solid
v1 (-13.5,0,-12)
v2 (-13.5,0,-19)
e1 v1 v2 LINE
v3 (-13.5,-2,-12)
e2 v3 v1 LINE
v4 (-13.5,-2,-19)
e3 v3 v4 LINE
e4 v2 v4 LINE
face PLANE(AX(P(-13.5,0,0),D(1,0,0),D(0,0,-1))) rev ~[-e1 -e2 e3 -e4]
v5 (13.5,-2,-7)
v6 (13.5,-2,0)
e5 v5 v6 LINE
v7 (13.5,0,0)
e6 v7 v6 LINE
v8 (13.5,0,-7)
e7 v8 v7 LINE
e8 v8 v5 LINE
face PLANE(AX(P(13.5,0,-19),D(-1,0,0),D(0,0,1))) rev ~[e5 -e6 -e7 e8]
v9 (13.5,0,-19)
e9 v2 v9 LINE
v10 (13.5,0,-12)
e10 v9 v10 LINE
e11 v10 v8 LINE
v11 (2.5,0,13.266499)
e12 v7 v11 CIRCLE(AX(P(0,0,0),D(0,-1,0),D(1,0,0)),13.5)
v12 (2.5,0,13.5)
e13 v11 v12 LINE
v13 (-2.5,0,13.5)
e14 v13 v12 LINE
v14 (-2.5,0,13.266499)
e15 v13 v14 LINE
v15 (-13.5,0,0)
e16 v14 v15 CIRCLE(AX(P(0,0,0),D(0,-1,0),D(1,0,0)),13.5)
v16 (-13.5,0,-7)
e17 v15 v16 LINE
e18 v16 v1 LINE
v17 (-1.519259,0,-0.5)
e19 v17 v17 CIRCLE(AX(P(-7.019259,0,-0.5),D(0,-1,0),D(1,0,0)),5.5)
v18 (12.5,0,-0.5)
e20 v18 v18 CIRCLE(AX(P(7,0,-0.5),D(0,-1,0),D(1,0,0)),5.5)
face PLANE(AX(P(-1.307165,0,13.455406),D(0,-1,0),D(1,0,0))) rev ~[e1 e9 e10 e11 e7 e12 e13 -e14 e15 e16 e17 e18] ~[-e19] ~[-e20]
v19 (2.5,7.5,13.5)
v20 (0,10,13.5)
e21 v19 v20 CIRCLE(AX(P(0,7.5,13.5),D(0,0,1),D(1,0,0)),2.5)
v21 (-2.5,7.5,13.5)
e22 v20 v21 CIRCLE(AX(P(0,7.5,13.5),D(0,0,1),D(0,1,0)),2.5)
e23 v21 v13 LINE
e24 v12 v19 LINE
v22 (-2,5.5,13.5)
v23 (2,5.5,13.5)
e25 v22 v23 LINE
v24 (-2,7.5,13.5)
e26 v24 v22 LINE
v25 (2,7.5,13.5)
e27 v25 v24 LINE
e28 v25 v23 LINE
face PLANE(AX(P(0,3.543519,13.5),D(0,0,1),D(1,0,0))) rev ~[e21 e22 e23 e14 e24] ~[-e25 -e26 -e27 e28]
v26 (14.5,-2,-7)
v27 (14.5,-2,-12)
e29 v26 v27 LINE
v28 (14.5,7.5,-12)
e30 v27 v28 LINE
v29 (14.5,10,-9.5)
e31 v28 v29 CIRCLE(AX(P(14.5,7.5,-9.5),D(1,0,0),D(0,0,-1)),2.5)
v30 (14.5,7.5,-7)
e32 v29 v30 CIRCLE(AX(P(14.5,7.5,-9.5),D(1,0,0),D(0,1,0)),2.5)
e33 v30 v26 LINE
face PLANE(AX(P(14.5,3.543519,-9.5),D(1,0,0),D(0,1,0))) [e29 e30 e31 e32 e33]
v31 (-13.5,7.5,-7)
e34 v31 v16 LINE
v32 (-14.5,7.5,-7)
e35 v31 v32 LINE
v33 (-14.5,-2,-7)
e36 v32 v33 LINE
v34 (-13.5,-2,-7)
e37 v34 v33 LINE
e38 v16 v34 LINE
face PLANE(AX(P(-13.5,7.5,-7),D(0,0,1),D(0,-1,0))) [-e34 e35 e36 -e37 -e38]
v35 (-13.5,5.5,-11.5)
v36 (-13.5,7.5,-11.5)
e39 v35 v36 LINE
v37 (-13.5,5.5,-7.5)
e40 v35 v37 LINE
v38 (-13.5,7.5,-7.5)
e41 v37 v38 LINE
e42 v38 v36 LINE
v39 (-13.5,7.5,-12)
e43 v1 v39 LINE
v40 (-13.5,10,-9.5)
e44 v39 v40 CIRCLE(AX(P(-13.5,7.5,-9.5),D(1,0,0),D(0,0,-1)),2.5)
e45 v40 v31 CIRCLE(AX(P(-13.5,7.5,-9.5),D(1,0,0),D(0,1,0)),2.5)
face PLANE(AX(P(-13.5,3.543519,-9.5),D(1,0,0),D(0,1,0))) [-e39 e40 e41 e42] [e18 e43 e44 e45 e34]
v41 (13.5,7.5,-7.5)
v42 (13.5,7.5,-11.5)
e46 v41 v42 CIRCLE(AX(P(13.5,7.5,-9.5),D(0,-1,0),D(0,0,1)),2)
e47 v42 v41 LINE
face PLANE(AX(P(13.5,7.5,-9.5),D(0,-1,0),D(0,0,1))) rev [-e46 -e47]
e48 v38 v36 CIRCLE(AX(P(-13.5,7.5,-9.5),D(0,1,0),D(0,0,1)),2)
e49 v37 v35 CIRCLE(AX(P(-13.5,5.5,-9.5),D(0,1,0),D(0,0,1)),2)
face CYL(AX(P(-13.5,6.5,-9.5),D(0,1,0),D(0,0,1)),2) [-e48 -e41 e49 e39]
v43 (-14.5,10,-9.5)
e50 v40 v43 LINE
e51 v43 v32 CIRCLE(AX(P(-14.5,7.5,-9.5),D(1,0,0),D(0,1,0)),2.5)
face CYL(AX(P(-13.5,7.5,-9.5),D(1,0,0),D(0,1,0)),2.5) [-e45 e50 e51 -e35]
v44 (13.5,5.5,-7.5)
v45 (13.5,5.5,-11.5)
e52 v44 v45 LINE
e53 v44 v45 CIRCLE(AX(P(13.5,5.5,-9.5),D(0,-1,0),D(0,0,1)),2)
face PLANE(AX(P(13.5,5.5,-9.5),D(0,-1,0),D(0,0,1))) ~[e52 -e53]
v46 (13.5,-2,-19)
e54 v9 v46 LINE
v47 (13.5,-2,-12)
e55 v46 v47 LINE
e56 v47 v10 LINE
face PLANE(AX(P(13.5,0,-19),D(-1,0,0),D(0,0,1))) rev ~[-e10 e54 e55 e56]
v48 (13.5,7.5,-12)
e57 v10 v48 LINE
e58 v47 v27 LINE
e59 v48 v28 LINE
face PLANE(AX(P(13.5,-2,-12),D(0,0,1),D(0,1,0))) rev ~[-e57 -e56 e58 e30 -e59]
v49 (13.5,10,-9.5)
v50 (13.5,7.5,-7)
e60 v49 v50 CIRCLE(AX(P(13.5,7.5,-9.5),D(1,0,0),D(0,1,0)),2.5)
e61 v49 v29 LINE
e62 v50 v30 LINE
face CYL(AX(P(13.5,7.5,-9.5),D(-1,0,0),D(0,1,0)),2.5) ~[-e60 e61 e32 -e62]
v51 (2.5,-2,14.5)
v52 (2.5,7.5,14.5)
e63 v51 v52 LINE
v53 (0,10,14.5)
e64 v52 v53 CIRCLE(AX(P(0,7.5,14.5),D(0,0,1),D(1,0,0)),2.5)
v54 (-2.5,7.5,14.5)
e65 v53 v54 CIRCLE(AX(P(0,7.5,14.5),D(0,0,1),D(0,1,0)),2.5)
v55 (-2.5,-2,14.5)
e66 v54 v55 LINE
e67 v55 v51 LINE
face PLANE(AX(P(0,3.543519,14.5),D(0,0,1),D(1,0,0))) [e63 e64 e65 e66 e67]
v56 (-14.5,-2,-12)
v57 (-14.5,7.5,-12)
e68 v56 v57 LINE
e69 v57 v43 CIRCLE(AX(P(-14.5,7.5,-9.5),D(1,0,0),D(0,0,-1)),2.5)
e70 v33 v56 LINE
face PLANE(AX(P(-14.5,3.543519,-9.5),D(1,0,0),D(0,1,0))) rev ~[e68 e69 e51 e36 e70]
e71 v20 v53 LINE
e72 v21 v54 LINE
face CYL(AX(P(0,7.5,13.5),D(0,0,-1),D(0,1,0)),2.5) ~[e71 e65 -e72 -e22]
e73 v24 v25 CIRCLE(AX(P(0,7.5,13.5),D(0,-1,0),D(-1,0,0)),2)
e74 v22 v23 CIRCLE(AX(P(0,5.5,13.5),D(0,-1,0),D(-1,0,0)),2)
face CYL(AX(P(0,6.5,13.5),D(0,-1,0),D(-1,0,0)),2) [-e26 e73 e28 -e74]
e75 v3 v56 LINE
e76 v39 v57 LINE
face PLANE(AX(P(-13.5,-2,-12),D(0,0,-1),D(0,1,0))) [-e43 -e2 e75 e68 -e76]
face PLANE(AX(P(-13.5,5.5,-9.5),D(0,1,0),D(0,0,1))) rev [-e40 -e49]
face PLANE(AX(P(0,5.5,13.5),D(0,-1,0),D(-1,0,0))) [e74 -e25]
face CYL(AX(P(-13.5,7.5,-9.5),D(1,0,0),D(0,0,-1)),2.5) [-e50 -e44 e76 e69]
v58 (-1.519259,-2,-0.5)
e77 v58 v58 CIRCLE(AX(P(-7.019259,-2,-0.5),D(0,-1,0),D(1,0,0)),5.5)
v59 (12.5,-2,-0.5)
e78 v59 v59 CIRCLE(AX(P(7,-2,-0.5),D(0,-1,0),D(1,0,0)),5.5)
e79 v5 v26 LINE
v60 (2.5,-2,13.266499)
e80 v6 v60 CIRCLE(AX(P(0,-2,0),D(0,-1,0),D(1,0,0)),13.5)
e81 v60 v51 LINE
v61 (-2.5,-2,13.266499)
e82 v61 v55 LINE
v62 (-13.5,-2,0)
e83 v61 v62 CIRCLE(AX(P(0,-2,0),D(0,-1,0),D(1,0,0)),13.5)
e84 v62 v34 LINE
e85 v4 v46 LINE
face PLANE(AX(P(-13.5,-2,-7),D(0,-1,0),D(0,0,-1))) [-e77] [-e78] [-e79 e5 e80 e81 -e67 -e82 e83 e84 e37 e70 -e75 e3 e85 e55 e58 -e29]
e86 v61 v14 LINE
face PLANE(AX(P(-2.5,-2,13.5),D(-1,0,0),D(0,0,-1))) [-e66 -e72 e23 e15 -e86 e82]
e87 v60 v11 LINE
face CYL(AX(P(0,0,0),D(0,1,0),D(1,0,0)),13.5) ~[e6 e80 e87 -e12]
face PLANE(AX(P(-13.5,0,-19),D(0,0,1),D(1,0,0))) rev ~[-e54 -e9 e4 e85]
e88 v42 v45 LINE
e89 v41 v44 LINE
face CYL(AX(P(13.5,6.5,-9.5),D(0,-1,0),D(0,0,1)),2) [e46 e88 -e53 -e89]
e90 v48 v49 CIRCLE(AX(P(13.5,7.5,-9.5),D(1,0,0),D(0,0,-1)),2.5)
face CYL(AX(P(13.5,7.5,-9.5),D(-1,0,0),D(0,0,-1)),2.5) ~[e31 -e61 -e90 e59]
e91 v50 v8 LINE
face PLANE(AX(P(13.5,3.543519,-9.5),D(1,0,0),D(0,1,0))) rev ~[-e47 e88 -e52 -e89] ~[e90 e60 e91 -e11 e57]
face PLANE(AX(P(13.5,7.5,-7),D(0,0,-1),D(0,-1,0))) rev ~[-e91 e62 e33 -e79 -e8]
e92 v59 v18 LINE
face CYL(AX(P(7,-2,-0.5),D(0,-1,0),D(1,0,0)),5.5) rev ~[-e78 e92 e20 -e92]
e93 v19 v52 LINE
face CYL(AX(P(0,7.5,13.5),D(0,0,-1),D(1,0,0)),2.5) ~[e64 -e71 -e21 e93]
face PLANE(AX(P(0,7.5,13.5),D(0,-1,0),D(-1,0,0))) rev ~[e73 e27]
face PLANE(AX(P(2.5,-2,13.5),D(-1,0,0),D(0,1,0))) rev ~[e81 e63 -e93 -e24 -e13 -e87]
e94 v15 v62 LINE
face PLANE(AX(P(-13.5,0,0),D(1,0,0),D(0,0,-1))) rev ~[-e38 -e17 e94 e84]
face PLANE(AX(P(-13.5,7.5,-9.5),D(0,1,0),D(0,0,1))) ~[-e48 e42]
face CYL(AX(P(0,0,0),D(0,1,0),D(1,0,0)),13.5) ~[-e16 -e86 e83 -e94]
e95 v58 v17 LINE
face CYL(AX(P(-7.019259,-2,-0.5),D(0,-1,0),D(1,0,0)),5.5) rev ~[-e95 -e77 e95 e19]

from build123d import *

# Parameters (mm, degrees)
F1_DEPTH  = 2
F4_DEPTH  = 1
F6_DEPTH  = 2
F9_DEPTH  = 1
F12_DEPTH = 1
F13_W     = 2
F13_H     = 2
F14_ANGLE = 180
F15_W     = 2
F15_H     = 2
F16_ANGLE = 180
F17_W     = 2
F17_H     = 2
F18_ANGLE = 180
F19_R     = 5.5
F20_DEPTH = 5


# Not quite as in the source:
# - a feature names something its author has since deleted; it is built from what else it names


with BuildPart() as f1:
    # F0 (on Front) → F1 (new body)
    with BuildSketch(Plane.XZ):
        with BuildLine():
            ThreePointArc((-13.5, 0), (0, -13.5), (13.5, 0))
            ThreePointArc((13.5, 0), (0, 13.5), (-13.5, 0))
        make_face()
        with BuildLine():
            Line((13.5, -19), (13.5, 0))
            ThreePointArc((13.5, 0), (0, -13.5), (-13.5, 0))
            Line((-13.5, 0), (-13.5, -19))
            Line((-13.5, -19), (13.5, -19))
        make_face()
    extrude(amount=F1_DEPTH)

    # F3 (on offset) → F4 (join)
    with BuildSketch(Plane.XY.offset(13.5)):
        with BuildLine():
            Line((-2.5, 7.5), (-2.5, -2))
            Line((-2.5, -2), (2.5, -2))
            Line((2.5, -2), (2.5, 7.5))
            ThreePointArc((2.5, 7.5), (1.767766953, 9.267766953), (0, 10))
            ThreePointArc((0, 10), (-1.767766953, 9.267766953), (-2.5, 7.5))
        make_face()
    extrude(amount=F4_DEPTH)

    # F5 (on face) → F6 (join)
    with BuildSketch(Plane.XZ.offset(2)):
        with BuildLine():
            Line((-2.5, 13.5), (-2.5, 13.2664991614))
            ThreePointArc((-2.5, 13.2664991614), (-1.2554404249, 13.4414980318), (0, 13.5))
            Line((0, 13.5), (-2.5, 13.5))
        make_face()
        with BuildLine():
            ThreePointArc((0, 13.5), (1.2554404249, 13.4414980318), (2.5, 13.2664991614))
            Line((2.5, 13.2664991614), (2.5, 13.5))
            Line((2.5, 13.5), (0, 13.5))
        make_face()
    extrude(amount=-F6_DEPTH)

    # F8 (on offset) → F9 (join)
    with BuildSketch(Plane.YZ.offset(13.5)):
        with BuildLine():
            Line((7.5, -7), (-2, -7))
            Line((-2, -7), (-2, -12))
            Line((-2, -12), (7.5, -12))
            ThreePointArc((7.5, -12), (9.267766953, -11.267766953), (10, -9.5))
            ThreePointArc((10, -9.5), (9.267766953, -7.732233047), (7.5, -7))
        make_face()
    extrude(amount=F9_DEPTH)

    # F11 (on offset) → F12 (join)
    with BuildSketch(Plane.YZ.offset(-13.5)):
        with BuildLine():
            Line((7.5, -7), (-2, -7))
            Line((-2, -7), (-2, -12))
            Line((-2, -12), (7.5, -12))
            ThreePointArc((7.5, -12), (9.267766953, -11.267766953), (10, -9.5))
            ThreePointArc((10, -9.5), (9.267766953, -7.732233047), (7.5, -7))
        make_face()
    extrude(amount=-F12_DEPTH)

    # F13 (on face) → F14 (revolve)
    with BuildSketch(Plane(origin=(0, 0, 13.5), x_dir=(1, 0, 0), z_dir=(0, 0, -1))):
        with Locations((-1, -6.5)):
            Rectangle(F13_W, F13_H)
    revolve(axis=Axis((0, 6.5, 13.5), (0, -1, 0)), revolution_arc=F14_ANGLE)

    # F15 (on face) → F16 (revolve)
    with BuildSketch(Plane(origin=(13.5, 0, 0), x_dir=(0, -1, 0), z_dir=(-1, 0, 0))):
        with Locations((-6.5, -8.5)):
            Rectangle(F15_W, F15_H)
    revolve(axis=Axis((13.5, 6.5, -9.5), (0, -1, 0)), revolution_arc=F16_ANGLE)

    # F17 (on face) → F18 (revolve)
    with BuildSketch(Plane.YZ.offset(-13.5)):
        with Locations((6.5, -8.5)):
            Rectangle(F17_W, F17_H)
    revolve(axis=Axis((-13.5, 6.5, -9.5), (0, 1, 0)), revolution_arc=F18_ANGLE)

    # F19 (on face) → F20 (cut)
    with BuildSketch(Plane.XZ.offset(2)):
        with Locations((-7.0192593016, -0.5)):
            Circle(F19_R)
        with Locations((7, -0.5)):
            Circle(F19_R)
    extrude(amount=-F20_DEPTH, mode=Mode.SUBTRACT)


solid = f1.part
